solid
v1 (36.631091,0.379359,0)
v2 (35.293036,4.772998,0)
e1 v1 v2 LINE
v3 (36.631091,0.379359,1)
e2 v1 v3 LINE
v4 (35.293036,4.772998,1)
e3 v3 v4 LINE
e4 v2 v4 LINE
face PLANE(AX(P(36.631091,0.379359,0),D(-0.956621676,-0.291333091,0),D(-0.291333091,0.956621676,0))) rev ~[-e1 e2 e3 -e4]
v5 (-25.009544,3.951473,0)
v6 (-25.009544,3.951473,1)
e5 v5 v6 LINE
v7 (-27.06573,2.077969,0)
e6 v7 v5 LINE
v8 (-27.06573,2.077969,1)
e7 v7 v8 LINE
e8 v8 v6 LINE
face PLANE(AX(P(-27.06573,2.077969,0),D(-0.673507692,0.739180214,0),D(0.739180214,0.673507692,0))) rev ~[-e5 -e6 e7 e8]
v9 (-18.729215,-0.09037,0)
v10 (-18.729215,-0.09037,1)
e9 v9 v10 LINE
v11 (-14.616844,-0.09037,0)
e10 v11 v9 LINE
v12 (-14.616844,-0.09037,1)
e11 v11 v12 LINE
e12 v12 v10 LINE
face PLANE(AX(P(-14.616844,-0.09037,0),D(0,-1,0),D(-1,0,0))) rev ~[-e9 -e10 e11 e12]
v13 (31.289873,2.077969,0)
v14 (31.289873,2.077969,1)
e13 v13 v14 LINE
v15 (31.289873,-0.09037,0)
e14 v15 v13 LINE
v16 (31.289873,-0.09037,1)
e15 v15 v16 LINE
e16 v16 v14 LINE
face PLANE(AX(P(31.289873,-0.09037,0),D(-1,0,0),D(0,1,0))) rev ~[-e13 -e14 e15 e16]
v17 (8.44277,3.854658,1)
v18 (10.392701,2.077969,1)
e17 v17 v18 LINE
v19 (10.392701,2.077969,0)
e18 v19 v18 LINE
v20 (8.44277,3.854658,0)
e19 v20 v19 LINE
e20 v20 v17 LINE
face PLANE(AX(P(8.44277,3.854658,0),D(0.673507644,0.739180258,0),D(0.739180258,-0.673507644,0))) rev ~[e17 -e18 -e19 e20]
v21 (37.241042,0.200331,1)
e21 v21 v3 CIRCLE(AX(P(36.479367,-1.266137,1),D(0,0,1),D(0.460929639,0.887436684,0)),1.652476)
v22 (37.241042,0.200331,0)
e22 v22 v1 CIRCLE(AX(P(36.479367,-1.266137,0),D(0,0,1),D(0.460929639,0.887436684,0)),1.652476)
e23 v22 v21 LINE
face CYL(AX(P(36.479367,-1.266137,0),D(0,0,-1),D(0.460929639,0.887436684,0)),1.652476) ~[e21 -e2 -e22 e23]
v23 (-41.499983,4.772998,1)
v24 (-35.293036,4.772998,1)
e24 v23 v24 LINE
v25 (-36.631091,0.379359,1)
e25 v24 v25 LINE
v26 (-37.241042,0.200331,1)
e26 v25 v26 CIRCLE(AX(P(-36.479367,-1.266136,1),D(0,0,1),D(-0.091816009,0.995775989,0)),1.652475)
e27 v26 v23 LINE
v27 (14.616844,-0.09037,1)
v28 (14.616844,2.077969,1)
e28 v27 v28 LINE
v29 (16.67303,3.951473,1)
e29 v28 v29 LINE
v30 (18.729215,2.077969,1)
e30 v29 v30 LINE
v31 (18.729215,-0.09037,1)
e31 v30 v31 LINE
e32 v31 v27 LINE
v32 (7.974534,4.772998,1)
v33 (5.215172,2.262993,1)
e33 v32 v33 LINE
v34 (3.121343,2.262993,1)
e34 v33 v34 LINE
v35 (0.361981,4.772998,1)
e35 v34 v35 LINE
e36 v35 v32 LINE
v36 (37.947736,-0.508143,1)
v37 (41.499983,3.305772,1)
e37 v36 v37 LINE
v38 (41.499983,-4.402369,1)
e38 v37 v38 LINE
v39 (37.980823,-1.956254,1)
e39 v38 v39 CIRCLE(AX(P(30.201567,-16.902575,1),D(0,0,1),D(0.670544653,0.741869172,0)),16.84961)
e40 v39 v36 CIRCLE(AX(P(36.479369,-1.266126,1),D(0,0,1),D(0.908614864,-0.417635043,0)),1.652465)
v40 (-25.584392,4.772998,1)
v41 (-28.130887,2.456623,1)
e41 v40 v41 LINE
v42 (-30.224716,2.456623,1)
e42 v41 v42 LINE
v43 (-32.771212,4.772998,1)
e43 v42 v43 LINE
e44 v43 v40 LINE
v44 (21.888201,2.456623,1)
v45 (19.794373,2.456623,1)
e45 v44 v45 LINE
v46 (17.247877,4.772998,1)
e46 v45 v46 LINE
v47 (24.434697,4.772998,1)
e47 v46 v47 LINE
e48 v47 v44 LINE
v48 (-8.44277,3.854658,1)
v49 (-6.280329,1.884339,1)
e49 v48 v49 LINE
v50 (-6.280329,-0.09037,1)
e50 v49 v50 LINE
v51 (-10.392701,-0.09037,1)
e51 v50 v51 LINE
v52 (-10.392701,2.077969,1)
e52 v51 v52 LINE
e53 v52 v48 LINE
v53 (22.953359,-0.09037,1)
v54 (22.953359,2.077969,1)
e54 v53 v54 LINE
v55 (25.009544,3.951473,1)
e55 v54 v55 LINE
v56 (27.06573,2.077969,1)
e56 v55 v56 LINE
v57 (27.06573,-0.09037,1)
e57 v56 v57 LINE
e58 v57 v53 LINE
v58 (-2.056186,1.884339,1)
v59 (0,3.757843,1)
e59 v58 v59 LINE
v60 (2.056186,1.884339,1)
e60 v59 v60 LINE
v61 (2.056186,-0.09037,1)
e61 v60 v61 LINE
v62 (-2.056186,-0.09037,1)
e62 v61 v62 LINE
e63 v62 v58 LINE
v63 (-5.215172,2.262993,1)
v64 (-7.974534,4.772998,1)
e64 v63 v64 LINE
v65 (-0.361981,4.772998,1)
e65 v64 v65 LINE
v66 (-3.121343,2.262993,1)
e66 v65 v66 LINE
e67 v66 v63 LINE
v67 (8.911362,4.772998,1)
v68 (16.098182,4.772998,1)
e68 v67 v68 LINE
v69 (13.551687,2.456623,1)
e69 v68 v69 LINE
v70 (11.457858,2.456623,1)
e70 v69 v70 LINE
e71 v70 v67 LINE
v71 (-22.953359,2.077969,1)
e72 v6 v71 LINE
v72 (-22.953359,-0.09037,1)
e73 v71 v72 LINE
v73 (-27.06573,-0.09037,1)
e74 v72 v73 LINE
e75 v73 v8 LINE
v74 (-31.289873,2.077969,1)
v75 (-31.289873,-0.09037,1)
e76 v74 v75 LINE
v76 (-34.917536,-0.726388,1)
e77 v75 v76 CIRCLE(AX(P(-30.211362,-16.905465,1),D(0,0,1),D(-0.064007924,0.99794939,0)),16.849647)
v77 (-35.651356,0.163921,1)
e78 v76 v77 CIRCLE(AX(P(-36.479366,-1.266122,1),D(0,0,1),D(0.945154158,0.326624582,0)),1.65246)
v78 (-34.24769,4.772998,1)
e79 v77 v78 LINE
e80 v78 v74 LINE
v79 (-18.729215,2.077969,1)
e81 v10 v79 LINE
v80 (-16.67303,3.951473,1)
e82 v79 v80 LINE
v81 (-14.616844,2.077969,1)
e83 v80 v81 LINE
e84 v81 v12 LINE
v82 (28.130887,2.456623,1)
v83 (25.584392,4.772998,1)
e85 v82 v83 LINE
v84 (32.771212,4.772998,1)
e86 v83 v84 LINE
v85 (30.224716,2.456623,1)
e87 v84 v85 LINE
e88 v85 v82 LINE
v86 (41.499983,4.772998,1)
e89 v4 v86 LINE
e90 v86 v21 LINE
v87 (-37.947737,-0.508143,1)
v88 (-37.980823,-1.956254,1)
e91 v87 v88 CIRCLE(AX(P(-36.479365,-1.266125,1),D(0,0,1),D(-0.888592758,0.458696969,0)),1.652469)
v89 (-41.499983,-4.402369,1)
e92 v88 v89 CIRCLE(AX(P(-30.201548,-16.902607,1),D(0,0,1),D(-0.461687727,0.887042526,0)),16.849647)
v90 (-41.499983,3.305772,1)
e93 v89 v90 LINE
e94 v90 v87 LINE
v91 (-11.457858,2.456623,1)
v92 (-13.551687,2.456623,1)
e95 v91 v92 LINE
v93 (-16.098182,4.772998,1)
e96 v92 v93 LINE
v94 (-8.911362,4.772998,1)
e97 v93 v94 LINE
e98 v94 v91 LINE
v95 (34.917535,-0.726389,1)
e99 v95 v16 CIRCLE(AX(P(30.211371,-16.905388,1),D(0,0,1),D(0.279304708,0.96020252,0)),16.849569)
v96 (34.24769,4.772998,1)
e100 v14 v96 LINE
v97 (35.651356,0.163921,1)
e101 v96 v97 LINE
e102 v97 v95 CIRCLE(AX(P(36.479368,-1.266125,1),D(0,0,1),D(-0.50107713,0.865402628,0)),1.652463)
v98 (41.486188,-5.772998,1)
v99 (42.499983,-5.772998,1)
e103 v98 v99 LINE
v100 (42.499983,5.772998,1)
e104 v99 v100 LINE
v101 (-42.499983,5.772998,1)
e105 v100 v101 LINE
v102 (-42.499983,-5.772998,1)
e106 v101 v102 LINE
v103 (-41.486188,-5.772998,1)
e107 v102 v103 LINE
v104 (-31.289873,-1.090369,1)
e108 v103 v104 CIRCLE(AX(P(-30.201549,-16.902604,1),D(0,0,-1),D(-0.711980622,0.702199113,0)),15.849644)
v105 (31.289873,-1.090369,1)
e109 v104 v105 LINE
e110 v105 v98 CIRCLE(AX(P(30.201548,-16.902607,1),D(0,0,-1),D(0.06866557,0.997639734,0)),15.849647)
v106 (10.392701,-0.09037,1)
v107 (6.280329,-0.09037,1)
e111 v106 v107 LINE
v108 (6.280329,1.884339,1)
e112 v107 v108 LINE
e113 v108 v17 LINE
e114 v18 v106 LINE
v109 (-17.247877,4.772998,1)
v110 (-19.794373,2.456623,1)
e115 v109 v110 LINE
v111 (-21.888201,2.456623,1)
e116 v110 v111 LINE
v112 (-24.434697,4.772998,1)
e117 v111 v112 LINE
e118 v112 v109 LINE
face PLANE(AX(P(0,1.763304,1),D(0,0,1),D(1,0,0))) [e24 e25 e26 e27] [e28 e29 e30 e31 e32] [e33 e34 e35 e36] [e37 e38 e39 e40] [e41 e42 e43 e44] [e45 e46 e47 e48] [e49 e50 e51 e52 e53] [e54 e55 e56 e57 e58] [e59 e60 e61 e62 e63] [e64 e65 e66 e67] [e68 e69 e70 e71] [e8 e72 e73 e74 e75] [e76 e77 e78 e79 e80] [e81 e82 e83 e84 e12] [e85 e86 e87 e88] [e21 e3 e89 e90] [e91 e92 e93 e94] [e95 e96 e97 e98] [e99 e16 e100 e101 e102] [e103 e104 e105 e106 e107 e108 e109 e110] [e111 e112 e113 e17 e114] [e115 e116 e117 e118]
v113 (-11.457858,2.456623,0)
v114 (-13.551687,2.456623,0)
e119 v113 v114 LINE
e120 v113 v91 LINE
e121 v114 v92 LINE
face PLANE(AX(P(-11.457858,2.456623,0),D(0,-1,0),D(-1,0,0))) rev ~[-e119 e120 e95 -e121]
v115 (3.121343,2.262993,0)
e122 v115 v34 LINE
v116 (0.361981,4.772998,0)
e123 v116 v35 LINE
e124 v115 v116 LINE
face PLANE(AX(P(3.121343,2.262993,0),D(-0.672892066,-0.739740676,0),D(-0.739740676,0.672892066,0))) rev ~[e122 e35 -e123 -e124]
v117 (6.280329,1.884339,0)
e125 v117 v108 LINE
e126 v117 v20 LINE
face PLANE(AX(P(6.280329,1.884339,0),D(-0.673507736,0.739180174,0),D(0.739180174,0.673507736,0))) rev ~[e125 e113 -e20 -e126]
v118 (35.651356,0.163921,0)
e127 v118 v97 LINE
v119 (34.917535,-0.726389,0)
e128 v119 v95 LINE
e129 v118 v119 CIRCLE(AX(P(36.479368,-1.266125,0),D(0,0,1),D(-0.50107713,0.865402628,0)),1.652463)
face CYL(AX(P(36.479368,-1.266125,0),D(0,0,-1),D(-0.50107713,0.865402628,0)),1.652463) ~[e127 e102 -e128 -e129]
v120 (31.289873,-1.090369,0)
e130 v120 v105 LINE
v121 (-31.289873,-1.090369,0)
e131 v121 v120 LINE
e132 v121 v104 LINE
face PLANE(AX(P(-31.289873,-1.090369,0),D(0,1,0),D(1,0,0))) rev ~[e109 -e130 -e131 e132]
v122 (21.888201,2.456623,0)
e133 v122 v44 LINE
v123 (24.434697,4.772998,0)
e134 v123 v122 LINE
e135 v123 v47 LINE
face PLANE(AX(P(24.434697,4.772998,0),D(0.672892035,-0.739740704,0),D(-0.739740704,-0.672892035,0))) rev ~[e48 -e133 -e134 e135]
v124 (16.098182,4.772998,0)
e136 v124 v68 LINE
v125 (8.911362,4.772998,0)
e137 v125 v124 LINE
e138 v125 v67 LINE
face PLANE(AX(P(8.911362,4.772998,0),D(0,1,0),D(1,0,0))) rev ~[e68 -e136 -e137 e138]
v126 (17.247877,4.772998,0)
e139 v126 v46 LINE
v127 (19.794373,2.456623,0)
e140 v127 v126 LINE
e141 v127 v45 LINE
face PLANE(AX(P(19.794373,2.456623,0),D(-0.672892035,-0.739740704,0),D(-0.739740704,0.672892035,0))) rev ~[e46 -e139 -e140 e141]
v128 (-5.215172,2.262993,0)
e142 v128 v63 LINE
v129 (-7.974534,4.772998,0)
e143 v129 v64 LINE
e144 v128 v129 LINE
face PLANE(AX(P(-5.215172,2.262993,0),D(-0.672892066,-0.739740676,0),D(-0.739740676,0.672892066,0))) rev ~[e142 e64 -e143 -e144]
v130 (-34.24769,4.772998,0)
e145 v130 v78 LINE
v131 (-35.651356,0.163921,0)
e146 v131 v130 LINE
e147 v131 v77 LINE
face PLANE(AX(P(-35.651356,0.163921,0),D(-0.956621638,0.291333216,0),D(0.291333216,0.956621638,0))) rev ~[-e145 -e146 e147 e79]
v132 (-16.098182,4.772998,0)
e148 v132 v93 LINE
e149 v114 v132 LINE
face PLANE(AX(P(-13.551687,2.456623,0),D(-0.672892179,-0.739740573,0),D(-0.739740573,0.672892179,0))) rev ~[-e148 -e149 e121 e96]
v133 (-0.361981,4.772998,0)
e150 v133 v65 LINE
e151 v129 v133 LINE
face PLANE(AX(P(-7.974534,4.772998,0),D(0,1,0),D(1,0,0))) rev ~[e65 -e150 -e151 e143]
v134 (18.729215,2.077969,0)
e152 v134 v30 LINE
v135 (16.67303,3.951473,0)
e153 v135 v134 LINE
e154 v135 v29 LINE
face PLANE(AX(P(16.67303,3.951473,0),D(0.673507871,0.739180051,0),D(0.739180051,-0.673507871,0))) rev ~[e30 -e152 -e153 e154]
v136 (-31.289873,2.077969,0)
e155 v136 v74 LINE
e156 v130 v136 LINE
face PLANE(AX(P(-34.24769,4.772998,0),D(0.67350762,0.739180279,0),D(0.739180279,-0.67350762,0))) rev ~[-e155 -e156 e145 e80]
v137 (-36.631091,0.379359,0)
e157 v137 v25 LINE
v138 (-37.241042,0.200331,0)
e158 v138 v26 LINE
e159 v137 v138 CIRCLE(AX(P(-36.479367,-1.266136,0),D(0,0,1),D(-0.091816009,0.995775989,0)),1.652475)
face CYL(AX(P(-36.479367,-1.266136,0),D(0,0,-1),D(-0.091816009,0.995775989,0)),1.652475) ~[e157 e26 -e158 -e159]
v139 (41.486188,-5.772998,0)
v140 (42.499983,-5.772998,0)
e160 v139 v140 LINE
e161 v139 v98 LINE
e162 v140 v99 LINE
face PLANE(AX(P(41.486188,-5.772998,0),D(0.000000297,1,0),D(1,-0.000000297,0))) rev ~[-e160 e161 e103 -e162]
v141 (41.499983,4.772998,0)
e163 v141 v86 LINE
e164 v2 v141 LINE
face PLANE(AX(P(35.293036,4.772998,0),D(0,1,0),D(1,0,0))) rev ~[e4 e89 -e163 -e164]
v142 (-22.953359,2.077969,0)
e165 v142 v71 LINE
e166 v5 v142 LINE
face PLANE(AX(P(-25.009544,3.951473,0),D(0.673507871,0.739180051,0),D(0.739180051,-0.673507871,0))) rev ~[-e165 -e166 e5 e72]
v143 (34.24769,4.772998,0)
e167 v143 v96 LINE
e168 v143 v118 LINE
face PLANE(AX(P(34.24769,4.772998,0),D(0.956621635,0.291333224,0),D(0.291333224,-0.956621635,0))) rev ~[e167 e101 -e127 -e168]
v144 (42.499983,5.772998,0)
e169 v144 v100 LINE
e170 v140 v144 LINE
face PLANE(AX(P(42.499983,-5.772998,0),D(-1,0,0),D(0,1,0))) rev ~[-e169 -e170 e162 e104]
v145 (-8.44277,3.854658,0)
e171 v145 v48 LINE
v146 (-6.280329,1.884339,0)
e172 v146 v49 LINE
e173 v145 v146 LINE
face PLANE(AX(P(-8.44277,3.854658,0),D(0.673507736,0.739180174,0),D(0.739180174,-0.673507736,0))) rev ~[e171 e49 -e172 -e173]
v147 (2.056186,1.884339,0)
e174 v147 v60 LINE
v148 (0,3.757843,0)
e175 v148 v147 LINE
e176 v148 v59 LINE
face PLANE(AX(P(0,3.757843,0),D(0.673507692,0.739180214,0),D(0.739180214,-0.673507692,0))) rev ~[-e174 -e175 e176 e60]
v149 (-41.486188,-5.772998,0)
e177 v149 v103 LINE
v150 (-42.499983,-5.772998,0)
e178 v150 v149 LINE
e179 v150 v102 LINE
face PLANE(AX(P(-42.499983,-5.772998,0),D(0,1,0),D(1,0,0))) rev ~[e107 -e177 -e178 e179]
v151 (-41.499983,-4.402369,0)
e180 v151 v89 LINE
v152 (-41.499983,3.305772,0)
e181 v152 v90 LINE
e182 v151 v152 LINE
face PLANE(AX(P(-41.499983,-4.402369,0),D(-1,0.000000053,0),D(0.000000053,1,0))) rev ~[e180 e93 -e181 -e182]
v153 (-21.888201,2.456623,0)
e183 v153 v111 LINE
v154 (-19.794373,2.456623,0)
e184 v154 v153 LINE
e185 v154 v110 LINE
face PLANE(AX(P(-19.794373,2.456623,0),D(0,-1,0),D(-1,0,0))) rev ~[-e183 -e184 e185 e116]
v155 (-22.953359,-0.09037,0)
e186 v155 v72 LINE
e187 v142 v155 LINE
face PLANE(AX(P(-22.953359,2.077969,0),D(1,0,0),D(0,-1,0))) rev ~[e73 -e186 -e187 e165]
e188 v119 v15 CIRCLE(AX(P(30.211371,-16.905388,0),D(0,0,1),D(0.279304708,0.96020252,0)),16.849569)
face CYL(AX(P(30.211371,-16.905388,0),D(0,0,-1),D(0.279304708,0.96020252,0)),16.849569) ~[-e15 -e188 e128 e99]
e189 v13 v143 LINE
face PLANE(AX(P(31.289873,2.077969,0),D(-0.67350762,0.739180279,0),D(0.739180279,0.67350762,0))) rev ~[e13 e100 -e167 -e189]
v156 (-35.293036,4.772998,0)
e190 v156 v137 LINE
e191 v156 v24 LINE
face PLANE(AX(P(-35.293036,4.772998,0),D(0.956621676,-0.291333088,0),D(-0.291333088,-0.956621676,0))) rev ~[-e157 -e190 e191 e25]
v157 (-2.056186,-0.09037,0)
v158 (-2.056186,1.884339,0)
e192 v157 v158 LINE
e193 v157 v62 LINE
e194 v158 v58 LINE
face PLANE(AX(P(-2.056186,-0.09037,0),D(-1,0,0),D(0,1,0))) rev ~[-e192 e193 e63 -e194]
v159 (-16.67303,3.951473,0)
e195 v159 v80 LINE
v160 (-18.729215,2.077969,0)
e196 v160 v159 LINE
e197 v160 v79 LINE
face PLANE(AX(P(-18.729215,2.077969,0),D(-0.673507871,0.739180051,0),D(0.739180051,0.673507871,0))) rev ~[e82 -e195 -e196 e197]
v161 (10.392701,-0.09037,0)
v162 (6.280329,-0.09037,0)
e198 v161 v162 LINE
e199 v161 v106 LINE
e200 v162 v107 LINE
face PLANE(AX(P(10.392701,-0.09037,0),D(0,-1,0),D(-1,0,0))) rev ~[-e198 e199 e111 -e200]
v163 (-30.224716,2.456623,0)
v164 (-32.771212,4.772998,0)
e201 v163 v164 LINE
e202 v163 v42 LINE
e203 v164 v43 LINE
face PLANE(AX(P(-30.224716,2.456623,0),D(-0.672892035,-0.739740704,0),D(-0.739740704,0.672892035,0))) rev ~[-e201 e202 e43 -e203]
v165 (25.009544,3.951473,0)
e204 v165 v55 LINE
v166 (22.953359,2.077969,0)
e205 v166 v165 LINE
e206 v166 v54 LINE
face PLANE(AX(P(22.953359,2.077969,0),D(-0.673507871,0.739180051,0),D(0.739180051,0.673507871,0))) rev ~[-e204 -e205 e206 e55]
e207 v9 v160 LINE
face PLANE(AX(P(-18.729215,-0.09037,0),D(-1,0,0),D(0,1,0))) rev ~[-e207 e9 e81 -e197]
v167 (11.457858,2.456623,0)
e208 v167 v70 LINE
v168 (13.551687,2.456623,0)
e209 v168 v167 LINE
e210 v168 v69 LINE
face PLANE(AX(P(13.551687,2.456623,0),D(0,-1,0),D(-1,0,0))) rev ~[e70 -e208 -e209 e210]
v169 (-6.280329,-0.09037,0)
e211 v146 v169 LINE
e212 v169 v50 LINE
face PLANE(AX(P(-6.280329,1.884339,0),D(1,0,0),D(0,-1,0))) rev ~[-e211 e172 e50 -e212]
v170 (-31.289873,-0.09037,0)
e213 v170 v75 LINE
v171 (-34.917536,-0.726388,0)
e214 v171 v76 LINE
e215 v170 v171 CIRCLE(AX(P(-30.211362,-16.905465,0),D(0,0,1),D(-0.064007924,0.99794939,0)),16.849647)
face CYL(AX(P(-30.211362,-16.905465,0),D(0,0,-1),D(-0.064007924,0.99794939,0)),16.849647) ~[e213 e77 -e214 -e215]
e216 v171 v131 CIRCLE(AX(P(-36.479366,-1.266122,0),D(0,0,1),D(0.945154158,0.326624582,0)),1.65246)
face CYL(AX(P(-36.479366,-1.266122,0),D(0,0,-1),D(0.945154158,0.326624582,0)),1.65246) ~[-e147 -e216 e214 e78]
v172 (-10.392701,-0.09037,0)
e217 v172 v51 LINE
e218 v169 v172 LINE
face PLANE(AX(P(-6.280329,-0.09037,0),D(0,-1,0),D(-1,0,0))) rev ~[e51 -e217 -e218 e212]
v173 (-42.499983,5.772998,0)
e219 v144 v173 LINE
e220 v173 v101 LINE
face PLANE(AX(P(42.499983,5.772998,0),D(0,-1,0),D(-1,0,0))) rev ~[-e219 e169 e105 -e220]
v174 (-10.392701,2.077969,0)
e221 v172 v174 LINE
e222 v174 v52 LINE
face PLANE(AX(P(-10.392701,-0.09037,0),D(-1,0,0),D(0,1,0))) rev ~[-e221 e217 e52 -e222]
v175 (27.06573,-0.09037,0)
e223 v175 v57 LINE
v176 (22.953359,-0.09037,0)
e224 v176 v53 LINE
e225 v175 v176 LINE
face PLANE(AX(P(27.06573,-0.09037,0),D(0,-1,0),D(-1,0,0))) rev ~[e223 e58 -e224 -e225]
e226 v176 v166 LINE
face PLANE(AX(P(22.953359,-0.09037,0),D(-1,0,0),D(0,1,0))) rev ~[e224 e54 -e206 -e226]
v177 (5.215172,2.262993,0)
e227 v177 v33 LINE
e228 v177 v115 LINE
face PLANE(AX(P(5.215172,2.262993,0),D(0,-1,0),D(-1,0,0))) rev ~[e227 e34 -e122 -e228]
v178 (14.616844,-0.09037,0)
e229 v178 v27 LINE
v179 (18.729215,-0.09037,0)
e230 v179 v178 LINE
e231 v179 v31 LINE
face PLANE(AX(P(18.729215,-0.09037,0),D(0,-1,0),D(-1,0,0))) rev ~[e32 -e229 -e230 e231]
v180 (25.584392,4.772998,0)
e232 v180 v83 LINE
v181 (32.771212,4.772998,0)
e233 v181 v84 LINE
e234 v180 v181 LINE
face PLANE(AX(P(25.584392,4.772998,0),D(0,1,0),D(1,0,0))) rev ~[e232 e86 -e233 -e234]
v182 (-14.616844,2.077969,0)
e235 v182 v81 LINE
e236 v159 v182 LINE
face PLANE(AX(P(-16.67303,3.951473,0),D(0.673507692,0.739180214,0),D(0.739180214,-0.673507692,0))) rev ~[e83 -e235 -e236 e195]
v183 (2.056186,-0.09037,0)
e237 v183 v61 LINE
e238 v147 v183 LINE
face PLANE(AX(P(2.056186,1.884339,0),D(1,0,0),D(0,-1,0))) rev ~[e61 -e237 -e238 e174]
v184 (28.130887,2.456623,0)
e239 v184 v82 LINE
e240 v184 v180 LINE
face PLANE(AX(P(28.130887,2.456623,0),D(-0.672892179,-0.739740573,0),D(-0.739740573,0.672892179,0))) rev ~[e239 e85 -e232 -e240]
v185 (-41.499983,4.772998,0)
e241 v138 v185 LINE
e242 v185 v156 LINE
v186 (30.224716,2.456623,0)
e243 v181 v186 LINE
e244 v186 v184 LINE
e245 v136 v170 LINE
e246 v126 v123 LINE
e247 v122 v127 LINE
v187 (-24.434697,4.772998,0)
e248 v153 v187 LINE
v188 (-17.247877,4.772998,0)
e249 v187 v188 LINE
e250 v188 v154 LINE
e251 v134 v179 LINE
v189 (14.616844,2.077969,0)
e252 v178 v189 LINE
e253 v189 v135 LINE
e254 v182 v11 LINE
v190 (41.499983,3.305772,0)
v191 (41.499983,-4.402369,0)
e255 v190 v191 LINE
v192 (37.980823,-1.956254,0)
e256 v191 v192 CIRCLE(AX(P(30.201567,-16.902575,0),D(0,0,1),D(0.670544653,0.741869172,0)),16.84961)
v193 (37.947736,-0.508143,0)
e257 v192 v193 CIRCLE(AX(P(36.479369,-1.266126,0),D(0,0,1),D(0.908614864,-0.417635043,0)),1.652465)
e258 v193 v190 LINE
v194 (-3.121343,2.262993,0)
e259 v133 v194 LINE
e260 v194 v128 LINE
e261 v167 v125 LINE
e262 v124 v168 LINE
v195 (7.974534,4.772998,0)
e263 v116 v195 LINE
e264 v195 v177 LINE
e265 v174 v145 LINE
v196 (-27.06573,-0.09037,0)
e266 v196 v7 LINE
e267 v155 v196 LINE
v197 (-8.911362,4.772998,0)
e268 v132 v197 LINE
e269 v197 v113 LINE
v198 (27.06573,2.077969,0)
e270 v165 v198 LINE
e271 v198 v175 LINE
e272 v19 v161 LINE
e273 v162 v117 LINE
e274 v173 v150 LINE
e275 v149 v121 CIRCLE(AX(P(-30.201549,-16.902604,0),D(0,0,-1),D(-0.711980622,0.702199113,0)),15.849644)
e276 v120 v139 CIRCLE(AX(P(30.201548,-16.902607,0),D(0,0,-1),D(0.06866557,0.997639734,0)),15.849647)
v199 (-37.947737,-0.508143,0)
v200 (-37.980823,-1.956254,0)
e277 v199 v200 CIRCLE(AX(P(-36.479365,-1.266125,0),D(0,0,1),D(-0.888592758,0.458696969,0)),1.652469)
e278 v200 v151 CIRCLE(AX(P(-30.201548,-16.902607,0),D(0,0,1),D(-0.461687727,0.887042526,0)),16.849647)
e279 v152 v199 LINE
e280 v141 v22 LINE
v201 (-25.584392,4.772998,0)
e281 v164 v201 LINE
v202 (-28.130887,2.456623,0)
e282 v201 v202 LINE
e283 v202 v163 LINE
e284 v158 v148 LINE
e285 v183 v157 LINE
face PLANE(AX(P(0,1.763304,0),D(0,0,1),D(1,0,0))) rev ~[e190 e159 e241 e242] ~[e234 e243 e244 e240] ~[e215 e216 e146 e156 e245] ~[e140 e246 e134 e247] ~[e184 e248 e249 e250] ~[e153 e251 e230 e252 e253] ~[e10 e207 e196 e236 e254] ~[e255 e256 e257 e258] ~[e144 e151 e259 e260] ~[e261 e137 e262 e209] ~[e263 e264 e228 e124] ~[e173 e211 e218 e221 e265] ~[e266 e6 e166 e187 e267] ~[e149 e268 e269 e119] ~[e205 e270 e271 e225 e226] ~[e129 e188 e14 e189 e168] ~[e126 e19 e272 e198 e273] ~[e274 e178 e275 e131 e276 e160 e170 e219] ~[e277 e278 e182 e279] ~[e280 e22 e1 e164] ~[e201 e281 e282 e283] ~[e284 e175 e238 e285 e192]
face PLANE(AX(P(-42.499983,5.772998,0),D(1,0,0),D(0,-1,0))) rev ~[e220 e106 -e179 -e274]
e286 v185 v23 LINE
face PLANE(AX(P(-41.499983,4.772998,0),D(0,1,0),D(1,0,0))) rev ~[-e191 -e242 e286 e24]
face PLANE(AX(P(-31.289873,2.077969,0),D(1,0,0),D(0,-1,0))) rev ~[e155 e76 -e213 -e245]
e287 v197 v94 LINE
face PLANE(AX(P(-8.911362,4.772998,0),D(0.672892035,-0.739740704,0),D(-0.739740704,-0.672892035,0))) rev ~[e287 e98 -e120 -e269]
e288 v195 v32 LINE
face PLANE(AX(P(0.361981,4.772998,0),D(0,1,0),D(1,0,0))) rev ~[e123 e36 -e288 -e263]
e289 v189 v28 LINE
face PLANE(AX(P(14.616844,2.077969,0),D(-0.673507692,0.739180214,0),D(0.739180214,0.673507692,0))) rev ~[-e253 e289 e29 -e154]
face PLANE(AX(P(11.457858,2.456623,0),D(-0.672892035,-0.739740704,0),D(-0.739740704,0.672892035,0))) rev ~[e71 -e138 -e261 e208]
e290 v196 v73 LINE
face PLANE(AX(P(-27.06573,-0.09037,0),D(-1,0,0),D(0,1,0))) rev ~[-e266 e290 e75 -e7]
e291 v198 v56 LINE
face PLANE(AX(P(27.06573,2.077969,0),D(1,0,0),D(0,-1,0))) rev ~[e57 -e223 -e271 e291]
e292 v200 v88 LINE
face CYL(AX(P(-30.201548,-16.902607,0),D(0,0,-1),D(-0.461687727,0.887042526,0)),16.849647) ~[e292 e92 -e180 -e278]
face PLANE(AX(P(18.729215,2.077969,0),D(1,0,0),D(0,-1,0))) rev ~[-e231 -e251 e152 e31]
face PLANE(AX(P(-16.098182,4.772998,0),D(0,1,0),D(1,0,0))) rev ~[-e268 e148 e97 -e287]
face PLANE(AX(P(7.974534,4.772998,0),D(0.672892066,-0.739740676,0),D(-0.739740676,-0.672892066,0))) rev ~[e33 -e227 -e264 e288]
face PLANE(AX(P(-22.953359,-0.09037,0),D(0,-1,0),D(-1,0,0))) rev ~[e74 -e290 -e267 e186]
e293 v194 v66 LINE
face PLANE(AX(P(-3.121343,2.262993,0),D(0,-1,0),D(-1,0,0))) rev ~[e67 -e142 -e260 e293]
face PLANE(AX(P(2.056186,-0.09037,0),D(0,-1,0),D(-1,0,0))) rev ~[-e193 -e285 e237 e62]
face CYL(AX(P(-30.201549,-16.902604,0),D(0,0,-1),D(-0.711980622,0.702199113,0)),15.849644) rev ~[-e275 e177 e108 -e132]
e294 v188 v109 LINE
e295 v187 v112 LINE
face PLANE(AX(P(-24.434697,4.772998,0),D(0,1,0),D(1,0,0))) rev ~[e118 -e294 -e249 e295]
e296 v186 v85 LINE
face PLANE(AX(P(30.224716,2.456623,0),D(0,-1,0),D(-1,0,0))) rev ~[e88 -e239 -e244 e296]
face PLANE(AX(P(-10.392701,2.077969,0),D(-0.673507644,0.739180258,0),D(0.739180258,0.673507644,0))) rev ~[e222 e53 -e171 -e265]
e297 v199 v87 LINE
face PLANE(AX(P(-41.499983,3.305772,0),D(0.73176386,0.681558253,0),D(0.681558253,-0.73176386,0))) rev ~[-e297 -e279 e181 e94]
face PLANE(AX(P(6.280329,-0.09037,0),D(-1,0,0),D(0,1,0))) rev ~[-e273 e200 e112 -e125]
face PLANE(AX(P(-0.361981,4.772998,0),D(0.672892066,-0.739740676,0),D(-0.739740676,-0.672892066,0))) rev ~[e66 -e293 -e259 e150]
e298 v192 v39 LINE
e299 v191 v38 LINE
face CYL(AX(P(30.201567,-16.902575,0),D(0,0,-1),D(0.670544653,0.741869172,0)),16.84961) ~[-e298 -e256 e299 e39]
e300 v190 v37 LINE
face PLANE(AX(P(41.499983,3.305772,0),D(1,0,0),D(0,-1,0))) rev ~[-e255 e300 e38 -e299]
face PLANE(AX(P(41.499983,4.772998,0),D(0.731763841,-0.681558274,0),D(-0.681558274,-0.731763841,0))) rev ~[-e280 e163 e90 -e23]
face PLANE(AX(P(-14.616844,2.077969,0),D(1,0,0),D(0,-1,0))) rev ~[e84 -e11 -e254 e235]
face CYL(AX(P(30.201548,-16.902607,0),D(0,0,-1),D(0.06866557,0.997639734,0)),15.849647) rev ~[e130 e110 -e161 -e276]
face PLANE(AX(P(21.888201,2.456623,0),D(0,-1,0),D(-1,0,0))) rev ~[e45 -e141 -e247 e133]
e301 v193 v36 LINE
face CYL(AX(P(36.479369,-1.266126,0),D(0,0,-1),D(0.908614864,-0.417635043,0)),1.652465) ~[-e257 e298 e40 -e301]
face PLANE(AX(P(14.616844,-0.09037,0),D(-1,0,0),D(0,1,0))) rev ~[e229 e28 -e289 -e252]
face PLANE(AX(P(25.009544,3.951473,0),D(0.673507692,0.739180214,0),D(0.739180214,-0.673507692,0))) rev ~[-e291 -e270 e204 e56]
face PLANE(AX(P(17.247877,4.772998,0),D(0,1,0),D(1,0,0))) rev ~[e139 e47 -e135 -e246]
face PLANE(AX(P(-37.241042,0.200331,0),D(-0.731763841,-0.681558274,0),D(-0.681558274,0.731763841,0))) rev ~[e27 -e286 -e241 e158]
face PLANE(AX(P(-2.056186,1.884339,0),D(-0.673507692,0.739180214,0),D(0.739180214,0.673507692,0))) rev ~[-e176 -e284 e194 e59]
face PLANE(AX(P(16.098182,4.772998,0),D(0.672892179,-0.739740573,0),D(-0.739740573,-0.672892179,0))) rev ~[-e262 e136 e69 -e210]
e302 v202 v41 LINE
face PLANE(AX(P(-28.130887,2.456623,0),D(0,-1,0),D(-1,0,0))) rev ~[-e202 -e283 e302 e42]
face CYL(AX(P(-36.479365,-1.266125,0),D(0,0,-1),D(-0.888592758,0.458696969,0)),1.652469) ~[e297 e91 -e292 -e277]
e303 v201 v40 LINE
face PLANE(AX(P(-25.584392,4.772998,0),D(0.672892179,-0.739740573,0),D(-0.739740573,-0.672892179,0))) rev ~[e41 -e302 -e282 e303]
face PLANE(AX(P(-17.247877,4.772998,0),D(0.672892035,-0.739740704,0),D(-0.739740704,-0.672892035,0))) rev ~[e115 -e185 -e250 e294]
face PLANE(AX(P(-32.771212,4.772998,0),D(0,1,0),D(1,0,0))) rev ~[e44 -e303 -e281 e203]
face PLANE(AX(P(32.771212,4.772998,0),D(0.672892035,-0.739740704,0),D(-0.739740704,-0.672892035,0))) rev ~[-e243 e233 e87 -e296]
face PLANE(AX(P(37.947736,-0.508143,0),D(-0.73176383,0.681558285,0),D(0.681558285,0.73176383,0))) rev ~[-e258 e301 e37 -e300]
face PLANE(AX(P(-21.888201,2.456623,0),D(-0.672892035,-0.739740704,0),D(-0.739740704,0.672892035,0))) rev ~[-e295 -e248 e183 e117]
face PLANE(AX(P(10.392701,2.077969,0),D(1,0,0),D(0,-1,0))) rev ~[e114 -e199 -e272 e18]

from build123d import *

# Parameters (mm, degrees)
F1_DEPTH = 1


# Not quite as in the source:
# - ends of sketch curves that miss each other by under 0.0002 mm in the source are joined


with BuildPart() as f1:
    # F0 (on Top) → F1 (new body)
    with BuildSketch(Plane.XY):
        with BuildLine():
            ThreePointArc((31.2898730428, -1.0903693776), (36.8162528215, -2.4992396802), (41.4861883055, -5.7729976987))
            Line((41.4861883055, -5.7729976987), (42.499983, -5.772998))
            Line((42.499983, -5.772998), (42.499983, 5.772998))
            Line((42.499983, 5.772998), (-42.499983, 5.772998))
            Line((-42.499983, 5.772998), (-42.499983, -5.772998))
            Line((-42.499983, -5.772998), (-41.486188, -5.772998))
            ThreePointArc((-41.486188, -5.772998), (-36.8162528215, -2.4992396802), (-31.2898730428, -1.0903693776))
            Line((-31.2898730428, -1.0903693776), (31.2898730428, -1.0903693776))
        make_face()
        with BuildLine():
            ThreePointArc((-37.980823226, -1.9562535657), (-39.8184929613, -3.0669655752), (-41.4999834083, -4.4023685483))
            Line((-41.4999834083, -4.4023685483), (-41.499983, 3.305772))
            Line((-41.499983, 3.305772), (-37.947737, -0.508143))
            ThreePointArc((-37.947737, -0.508143), (-38.1314028467, -1.2283801993), (-37.980823226, -1.9562535657))
        make_face(mode=Mode.SUBTRACT)
        with BuildLine():
            Line((41.499983, 3.305772), (41.499983, -4.402369))
            ThreePointArc((41.499983, -4.402369), (39.8184929613, -3.0669655752), (37.980823226, -1.9562535657))
            ThreePointArc((37.980823226, -1.9562535657), (38.1314028467, -1.2283801993), (37.9477363989, -0.5081433103))
            Line((37.9477363989, -0.5081433103), (41.499983, 3.305772))
        make_face(mode=Mode.SUBTRACT)
        with BuildLine():
            Line((-31.289873, 2.077969), (-31.289873, -0.09037))
            ThreePointArc((-31.289873, -0.09037), (-33.1211344425, -0.3089644519), (-34.9175362693, -0.7263880763))
            ThreePointArc((-34.9175362693, -0.7263880763), (-35.2042200678, -0.2151094555), (-35.6513559051, 0.1639211639))
            Line((-35.6513559051, 0.1639211639), (-34.24769, 4.772998))
            Line((-34.24769, 4.772998), (-31.289873, 2.077969))
        make_face(mode=Mode.SUBTRACT)
        with BuildLine():
            Line((-37.241042, 0.200331), (-41.499983, 4.772998))
            Line((-41.499983, 4.772998), (-35.293036, 4.772998))
            Line((-35.293036, 4.772998), (-36.631091, 0.379359))
            ThreePointArc((-36.631091, 0.379359), (-36.9447562748, 0.3194512642), (-37.241042, 0.200331))
        make_face(mode=Mode.SUBTRACT)
        Polygon((-22.953359, -0.09037), (-27.06573, -0.09037), (-27.06573, 2.077969), (-25.009544, 3.951473), (-22.953359, 2.077969), align=None, mode=Mode.SUBTRACT)
        Polygon((-14.616844, -0.09037), (-18.729215, -0.09037), (-18.729215, 2.077969), (-16.67303, 3.951473), (-14.616844, 2.077969), align=None, mode=Mode.SUBTRACT)
        Polygon((-6.280329, -0.09037), (-10.392701, -0.09037), (-10.392701, 2.077969), (-8.44277, 3.854658), (-6.280329, 1.884339), align=None, mode=Mode.SUBTRACT)
        Polygon((-25.584392, 4.772998), (-28.130887, 2.456623), (-30.224716, 2.456623), (-32.771212, 4.772998), align=None, mode=Mode.SUBTRACT)
        Polygon((-19.794373, 2.456623), (-21.888201, 2.456623), (-24.434697, 4.772998), (-17.247877, 4.772998), align=None, mode=Mode.SUBTRACT)
        Polygon((-11.457858, 2.456623), (-13.551687, 2.456623), (-16.098182, 4.772998), (-8.911362, 4.772998), align=None, mode=Mode.SUBTRACT)
        Polygon((-3.121343, 2.262993), (-5.215172, 2.262993), (-7.974534, 4.772998), (-0.361981, 4.772998), align=None, mode=Mode.SUBTRACT)
        Polygon((0, -0.09037), (-2.056186, -0.09037), (-2.056186, 1.884339), (0, 3.757843), (2.056186, 1.884339), (2.056186, -0.09037), align=None, mode=Mode.SUBTRACT)
        Polygon((10.392701, 2.077969), (10.392701, -0.09037), (6.280329, -0.09037), (6.280329, 1.884339), (8.44277, 3.854658), align=None, mode=Mode.SUBTRACT)
        Polygon((18.729215, 2.077969), (18.729215, -0.09037), (14.616844, -0.09037), (14.616844, 2.077969), (16.67303, 3.951473), align=None, mode=Mode.SUBTRACT)
        Polygon((27.06573, 2.077969), (27.06573, -0.09037), (22.953359, -0.09037), (22.953359, 2.077969), (25.009544, 3.951473), align=None, mode=Mode.SUBTRACT)
        with BuildLine():
            Line((31.289873, -0.09037), (31.289873, 2.077969))
            Line((31.289873, 2.077969), (34.24769, 4.772998))
            Line((34.24769, 4.772998), (35.651356, 0.163921))
            ThreePointArc((35.651356, 0.163921), (35.2042200678, -0.2151094555), (34.9175353631, -0.7263887799))
            ThreePointArc((34.9175353631, -0.7263887799), (33.1211344425, -0.3089644519), (31.289873, -0.09037))
        make_face(mode=Mode.SUBTRACT)
        with BuildLine():
            Line((35.293036, 4.772998), (41.499983, 4.772998))
            Line((41.499983, 4.772998), (37.241042, 0.200331))
            ThreePointArc((37.241042, 0.200331), (36.9447562748, 0.3194512642), (36.6310910035, 0.3793590379))
            Line((36.6310910035, 0.3793590379), (35.293036, 4.772998))
        make_face(mode=Mode.SUBTRACT)
        Polygon((7.974534, 4.772998), (5.215172, 2.262993), (3.121343, 2.262993), (0.361981, 4.772998), align=None, mode=Mode.SUBTRACT)
        Polygon((16.098182, 4.772998), (13.551687, 2.456623), (11.457858, 2.456623), (8.911362, 4.772998), align=None, mode=Mode.SUBTRACT)
        Polygon((24.434697, 4.772998), (21.888201, 2.456623), (19.794373, 2.456623), (17.247877, 4.772998), align=None, mode=Mode.SUBTRACT)
        Polygon((32.771212, 4.772998), (30.224716, 2.456623), (28.130887, 2.456623), (25.584392, 4.772998), align=None, mode=Mode.SUBTRACT)
    extrude(amount=F1_DEPTH)


solid = f1.part
